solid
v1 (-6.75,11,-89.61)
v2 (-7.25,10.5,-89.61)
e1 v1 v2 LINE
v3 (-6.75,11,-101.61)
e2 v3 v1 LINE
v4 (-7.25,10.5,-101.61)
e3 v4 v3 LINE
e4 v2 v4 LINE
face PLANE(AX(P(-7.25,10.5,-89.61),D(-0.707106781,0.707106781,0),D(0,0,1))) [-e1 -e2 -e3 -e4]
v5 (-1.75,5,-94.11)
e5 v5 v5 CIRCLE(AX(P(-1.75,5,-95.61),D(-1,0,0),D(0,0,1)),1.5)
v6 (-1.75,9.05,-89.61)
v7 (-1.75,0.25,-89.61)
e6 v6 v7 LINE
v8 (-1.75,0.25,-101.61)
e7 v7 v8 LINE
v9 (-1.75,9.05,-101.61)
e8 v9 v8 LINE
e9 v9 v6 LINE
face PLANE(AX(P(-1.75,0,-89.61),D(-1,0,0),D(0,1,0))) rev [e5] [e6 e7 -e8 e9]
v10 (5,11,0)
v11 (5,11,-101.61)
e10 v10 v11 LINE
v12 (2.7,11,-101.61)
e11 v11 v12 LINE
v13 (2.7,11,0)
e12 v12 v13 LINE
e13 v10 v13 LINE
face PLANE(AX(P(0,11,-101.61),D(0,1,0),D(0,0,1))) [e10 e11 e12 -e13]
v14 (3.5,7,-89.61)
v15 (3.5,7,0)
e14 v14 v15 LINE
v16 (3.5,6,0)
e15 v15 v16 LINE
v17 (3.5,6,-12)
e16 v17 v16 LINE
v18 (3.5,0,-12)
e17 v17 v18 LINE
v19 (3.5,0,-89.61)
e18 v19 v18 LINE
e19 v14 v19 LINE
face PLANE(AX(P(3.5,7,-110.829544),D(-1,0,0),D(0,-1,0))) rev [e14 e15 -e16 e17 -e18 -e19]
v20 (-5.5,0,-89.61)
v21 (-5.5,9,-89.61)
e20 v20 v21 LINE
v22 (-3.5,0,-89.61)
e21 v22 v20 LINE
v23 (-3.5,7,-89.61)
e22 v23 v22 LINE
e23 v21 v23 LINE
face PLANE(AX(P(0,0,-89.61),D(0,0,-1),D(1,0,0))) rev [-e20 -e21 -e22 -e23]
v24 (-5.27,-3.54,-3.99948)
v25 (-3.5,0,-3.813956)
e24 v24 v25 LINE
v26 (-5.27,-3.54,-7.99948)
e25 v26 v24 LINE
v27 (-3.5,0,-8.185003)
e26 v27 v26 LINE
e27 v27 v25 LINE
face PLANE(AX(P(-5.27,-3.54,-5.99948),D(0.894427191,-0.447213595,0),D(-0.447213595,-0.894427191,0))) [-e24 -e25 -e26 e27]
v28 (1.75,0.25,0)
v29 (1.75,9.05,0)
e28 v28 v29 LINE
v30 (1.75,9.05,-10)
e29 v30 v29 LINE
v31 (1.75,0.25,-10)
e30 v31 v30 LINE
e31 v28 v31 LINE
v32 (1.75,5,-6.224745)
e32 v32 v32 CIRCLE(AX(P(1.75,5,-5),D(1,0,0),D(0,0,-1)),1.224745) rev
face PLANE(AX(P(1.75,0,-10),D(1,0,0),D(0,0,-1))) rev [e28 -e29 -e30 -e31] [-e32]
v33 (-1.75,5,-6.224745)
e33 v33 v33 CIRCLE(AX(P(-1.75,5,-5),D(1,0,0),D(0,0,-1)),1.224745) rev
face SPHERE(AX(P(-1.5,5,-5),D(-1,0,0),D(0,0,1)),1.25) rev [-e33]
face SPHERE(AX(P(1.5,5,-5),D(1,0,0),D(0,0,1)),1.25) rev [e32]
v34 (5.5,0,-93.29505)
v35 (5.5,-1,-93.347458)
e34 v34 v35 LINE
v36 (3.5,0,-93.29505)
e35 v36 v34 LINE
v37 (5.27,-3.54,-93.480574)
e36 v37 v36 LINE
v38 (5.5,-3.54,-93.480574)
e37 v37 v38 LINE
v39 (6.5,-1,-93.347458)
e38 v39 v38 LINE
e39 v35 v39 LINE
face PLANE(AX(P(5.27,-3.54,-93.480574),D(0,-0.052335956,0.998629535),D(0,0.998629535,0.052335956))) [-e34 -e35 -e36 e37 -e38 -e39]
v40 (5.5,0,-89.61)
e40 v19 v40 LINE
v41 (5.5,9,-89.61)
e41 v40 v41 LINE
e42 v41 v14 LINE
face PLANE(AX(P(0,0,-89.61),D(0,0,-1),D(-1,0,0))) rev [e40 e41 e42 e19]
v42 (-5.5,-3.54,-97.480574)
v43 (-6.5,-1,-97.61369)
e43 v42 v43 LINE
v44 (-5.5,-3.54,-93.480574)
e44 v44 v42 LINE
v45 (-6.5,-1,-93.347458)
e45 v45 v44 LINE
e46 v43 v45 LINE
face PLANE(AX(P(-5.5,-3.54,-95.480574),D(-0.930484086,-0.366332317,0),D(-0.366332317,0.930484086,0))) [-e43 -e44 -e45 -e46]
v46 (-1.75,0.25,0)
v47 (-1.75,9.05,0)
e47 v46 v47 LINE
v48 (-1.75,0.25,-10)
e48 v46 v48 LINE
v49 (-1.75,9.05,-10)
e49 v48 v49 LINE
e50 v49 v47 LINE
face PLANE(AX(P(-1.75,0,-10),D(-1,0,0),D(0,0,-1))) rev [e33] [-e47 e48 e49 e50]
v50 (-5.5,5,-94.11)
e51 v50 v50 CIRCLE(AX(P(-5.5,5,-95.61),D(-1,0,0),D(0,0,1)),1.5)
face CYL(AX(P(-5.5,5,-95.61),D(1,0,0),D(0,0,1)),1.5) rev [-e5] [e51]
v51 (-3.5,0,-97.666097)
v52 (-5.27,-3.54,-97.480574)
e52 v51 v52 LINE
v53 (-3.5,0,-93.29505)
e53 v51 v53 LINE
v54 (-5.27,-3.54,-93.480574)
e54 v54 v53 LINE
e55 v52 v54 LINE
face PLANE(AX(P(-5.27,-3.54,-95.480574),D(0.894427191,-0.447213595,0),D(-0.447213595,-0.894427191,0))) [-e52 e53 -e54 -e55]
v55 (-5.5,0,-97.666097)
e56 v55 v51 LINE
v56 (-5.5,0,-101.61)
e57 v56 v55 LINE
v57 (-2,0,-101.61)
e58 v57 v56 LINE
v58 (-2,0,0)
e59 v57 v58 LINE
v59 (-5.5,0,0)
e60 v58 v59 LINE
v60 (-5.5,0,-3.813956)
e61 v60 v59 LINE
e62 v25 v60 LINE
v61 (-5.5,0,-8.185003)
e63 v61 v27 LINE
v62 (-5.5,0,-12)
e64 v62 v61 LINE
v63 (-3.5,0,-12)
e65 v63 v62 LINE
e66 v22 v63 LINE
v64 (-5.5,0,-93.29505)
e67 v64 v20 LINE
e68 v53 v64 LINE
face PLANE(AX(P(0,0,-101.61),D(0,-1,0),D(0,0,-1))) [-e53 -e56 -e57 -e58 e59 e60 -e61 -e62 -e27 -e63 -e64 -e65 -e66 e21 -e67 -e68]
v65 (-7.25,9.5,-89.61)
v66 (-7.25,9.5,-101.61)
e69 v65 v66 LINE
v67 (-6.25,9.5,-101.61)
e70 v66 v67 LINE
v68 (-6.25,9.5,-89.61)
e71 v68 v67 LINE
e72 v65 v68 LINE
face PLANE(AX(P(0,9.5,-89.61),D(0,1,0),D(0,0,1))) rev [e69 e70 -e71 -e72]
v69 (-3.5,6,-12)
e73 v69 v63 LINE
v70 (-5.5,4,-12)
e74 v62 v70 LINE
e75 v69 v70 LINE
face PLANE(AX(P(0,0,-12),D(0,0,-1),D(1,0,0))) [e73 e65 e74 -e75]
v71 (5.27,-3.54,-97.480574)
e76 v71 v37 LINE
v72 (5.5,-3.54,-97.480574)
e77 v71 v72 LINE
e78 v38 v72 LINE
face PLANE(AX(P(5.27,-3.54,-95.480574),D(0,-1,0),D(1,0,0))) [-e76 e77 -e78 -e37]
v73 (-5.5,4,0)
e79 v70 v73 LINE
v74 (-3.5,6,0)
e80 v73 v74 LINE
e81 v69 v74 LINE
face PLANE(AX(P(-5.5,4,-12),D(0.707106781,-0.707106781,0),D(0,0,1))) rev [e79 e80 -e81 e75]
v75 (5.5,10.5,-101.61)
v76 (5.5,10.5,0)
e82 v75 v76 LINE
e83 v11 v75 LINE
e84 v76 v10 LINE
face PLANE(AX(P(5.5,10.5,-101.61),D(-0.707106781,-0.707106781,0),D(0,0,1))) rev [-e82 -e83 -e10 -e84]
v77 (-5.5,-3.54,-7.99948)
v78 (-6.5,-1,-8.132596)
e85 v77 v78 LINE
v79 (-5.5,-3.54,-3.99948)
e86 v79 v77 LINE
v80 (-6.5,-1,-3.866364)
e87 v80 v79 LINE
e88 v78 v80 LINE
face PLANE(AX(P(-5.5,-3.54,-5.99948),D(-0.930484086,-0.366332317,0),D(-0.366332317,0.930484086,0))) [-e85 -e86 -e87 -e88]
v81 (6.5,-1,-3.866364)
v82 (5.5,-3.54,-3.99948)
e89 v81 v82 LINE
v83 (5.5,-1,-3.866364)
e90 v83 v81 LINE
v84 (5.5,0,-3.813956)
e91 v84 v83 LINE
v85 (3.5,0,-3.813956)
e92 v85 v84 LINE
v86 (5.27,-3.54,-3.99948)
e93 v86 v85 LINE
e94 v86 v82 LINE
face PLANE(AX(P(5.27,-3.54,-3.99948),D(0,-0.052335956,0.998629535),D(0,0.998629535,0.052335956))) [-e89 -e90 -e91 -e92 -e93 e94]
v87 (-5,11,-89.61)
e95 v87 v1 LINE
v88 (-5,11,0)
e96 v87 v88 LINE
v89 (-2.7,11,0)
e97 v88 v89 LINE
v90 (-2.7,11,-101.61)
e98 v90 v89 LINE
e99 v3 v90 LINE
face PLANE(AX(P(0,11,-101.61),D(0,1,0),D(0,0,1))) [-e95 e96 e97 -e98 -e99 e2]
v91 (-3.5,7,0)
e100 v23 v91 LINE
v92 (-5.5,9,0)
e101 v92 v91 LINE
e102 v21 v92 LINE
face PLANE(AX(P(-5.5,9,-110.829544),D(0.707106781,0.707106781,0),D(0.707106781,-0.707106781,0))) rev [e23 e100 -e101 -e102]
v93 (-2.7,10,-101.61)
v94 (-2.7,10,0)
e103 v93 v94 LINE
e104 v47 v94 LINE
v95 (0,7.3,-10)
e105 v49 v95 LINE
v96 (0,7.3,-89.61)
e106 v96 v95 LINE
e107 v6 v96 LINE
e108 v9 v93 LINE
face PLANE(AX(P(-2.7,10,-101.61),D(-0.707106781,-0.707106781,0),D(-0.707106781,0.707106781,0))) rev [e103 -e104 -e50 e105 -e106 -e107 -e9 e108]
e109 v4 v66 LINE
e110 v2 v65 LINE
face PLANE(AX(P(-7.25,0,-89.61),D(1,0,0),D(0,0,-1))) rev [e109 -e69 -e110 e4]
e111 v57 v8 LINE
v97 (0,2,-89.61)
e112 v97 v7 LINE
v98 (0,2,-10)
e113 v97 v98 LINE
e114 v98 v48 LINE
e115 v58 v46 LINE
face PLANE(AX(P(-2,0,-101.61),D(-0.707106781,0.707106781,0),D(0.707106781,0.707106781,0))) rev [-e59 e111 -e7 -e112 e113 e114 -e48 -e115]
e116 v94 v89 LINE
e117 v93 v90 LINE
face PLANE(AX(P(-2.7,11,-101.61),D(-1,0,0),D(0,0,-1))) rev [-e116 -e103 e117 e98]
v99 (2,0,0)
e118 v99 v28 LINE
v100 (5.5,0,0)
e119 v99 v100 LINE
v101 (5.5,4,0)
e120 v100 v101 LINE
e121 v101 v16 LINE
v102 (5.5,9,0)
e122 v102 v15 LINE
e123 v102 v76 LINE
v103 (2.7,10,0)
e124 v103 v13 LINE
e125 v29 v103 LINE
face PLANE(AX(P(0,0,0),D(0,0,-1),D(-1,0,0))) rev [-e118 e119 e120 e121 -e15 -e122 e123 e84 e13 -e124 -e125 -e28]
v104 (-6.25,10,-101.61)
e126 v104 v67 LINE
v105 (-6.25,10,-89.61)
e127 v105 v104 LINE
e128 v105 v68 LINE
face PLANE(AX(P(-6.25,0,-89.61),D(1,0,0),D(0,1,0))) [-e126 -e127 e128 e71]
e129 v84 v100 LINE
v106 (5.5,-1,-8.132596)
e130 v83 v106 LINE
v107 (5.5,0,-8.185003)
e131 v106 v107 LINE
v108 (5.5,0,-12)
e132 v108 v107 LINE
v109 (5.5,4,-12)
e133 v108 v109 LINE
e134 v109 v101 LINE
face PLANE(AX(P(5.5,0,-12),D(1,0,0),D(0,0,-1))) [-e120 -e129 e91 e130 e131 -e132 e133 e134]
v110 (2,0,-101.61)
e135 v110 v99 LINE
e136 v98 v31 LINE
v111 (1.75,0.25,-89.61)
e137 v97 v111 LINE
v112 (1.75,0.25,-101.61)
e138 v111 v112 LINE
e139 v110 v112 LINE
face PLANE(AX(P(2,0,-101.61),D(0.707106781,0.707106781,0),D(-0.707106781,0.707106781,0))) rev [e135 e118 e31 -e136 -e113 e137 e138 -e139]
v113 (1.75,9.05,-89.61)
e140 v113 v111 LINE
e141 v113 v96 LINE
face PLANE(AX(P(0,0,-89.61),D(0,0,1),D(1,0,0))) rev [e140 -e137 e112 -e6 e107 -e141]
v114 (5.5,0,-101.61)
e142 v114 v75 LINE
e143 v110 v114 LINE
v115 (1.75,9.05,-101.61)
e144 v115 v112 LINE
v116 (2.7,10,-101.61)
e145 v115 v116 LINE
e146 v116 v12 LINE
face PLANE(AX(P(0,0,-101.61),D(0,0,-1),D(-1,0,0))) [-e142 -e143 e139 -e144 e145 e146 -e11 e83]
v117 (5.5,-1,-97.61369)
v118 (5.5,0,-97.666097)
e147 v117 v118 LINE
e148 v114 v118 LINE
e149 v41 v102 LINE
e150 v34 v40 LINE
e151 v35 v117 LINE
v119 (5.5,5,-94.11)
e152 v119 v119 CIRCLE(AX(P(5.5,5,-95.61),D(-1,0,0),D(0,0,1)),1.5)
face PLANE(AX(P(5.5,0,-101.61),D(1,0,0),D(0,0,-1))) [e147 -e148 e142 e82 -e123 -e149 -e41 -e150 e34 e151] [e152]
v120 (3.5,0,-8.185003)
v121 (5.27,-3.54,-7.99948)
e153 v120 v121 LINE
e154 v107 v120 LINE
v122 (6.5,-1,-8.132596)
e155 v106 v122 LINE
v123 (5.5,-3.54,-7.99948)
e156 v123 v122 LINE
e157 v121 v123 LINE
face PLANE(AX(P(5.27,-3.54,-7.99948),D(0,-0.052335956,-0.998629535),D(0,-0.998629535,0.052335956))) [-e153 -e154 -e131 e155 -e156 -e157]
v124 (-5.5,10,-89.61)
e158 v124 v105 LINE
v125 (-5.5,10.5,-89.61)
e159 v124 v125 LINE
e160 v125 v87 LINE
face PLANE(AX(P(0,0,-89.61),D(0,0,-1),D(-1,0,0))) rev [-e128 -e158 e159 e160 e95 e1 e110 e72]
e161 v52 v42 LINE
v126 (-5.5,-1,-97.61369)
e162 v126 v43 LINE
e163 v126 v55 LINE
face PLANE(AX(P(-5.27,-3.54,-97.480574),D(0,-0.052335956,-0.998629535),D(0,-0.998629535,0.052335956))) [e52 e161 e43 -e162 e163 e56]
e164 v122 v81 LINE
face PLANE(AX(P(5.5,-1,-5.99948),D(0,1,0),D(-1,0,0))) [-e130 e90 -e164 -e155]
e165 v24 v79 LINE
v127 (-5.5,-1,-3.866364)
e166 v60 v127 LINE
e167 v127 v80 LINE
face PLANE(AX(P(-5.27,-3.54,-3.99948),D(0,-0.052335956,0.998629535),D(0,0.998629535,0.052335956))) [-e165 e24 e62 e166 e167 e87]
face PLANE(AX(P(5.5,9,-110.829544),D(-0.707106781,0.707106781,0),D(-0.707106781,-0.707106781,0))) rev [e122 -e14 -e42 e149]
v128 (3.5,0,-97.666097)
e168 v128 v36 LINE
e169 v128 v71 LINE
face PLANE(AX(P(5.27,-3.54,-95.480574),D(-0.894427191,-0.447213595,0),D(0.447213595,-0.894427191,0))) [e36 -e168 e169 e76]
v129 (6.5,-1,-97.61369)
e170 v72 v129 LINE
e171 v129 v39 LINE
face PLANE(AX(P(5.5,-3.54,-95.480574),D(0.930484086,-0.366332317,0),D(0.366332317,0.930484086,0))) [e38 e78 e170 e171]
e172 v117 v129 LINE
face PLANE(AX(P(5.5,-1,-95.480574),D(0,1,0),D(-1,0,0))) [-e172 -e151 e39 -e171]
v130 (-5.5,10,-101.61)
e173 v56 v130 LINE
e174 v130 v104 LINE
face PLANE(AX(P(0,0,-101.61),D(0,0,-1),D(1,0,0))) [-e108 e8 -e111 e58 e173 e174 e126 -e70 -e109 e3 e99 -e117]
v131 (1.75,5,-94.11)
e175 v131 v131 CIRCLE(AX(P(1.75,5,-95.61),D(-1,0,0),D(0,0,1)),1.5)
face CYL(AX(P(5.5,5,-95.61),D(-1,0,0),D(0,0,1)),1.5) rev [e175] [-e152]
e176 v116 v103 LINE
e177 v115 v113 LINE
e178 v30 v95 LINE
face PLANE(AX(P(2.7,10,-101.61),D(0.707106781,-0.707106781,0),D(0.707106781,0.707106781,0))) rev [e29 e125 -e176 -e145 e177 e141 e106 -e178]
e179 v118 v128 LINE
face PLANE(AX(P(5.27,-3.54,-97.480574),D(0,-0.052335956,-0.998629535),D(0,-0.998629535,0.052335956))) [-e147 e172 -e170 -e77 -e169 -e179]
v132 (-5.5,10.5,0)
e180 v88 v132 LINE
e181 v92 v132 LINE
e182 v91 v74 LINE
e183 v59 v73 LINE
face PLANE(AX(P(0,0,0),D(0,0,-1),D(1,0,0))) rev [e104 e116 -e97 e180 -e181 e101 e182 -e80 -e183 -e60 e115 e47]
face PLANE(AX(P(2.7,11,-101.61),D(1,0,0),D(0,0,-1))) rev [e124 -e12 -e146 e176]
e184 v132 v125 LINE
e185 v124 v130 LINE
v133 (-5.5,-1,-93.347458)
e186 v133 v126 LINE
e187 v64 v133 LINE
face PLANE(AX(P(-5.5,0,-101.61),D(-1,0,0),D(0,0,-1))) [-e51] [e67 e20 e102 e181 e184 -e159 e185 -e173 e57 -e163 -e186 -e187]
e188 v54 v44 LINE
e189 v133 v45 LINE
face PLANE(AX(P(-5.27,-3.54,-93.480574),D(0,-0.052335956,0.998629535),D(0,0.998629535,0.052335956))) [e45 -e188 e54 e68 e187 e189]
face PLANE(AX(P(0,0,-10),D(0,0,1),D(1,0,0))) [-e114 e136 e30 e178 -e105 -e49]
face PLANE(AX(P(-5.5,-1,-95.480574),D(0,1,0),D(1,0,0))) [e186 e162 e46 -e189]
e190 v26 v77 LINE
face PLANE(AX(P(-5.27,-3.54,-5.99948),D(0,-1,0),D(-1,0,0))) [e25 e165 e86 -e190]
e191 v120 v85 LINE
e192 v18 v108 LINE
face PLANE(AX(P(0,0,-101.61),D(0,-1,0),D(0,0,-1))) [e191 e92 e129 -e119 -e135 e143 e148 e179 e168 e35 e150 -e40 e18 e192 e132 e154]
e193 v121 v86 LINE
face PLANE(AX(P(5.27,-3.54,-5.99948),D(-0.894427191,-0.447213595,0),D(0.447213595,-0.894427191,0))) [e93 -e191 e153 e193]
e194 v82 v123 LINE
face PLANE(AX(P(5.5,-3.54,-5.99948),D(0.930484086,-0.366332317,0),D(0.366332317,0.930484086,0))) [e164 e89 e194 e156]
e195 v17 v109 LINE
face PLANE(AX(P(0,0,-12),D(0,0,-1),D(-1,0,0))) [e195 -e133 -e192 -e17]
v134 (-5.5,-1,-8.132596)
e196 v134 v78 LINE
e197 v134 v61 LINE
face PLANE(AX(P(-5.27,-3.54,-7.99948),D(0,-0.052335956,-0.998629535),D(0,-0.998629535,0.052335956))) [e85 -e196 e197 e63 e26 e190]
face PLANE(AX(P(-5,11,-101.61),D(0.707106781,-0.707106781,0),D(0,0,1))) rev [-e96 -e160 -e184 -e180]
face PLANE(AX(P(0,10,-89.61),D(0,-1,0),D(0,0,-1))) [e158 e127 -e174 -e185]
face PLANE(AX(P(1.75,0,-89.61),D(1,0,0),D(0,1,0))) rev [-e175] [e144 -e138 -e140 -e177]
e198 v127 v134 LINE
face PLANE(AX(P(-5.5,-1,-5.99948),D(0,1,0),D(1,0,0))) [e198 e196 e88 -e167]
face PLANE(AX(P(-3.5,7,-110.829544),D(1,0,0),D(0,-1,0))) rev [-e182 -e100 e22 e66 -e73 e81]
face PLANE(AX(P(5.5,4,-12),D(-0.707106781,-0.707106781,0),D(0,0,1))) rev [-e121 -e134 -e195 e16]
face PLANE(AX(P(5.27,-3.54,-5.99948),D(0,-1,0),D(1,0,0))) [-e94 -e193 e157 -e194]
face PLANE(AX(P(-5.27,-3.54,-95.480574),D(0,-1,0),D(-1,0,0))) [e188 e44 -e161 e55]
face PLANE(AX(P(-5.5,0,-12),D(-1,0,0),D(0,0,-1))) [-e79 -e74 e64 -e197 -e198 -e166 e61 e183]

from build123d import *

# Parameters (mm, degrees)
SKETCH1_W                        = 5.5
SKETCH1_H                        = 11
MAIN_BASE_DEPTH                  = 101.61
SIDE_CUT_OUT_DEPTH               = 89.61
TOP_RUBBER_BAND_CUT_OUT_DEPTH    = 103.351561297
BOTTOM_RUBBER_BAND_CUT_OUT_DEPTH = 103.351561297
SKETCH6_W                        = 1.75
SKETCH6_H                        = 11
MOTOR_PULLEY_CUT_OUT_DEPTH       = 12
SKETCH7_W                        = 1.75
SKETCH7_H                        = 11
PULLEY_CUT_OUT_DEPTH             = 10
SKETCH11_R                       = 1.5
MOTOR_SHAFT_CUT_OUT_DEPTH        = 103.272452792
SNAP_START                       = 5.27
SNAP_HOOK_DRIVEN_SIDE_DEPTH      = 0.23
SNAP_START_2                     = -97.613689555
SNAP_HOOK_DRIVEN_SIDE_2_DEPTH    = 4.266231519
SNAP_START_3                     = -97.666097334
SNAP_HOOK_DRIVEN_SIDE_3_DEPTH    = 4.371047077
SNAP_START_4                     = 3
SNAP_HOOK_DRIVEN_SIDE_4_DEPTH    = 4
SKETCH16_W                       = 2
SKETCH16_H                       = 6
SNAP_HOOK_BASE_DEPTH             = 12
SNAP_HOOK_BASE_CHAMFER_SIZE      = 2
SNAP_HOOK_GUIDE_SIDE_DEPTH       = 0.23
SNAP_START_5                     = -8.132595504
SNAP_HOOK_GUIDE_SIDE_2_DEPTH     = 4.266231519
SNAP_START_6                     = -8.185003283
SNAP_HOOK_GUIDE_SIDE_3_DEPTH     = 4.371047078
SNAP_HOOK_GUIDE_SIDE_4_DEPTH     = 4
SKETCH13_W                       = 1
SKETCH13_H                       = 0.5
BOSS_EXTRUDE3_DEPTH              = 12
RAIL_CHAMFER_SIZE                = 0.5


with BuildPart() as part:
    # Sketch1 → main_base (new body)
    with BuildSketch(Plane.XY):
        with Locations((2.75, 5.5)):
            Rectangle(SKETCH1_W, SKETCH1_H)
    extrude(amount=-MAIN_BASE_DEPTH)

    # Sketch3 → side_cut_out (cut)
    with BuildSketch(Plane.XY):
        Polygon((5.5, 9), (3.5, 7), (3.5, 0), (5.5, 0), align=None)
    extrude(amount=-SIDE_CUT_OUT_DEPTH, mode=Mode.SUBTRACT)

    # Sketch4 → top_rubber_band_cut_out (cut, through all)
    with BuildSketch(Plane.XY):
        Polygon((0, 7.3), (0, 11), (2.7, 11), (2.7, 10), align=None)
    extrude(amount=-TOP_RUBBER_BAND_CUT_OUT_DEPTH, mode=Mode.SUBTRACT)

    # Sketch5 → bottom_rubber_band_cut_out (cut, through all)
    with BuildSketch(Plane.XY):
        Polygon((2, 0), (0, 2), (0, 0), align=None)
    extrude(amount=-BOTTOM_RUBBER_BAND_CUT_OUT_DEPTH, mode=Mode.SUBTRACT)

    # Sketch6 → motor_pulley_cut_out (cut)
    with BuildSketch(Plane(origin=(0, 0, -101.61), x_dir=(-1, 0, 0), z_dir=(0, 0, -1))):
        with Locations((-0.875, 5.5)):
            Rectangle(SKETCH6_W, SKETCH6_H)
    extrude(amount=-MOTOR_PULLEY_CUT_OUT_DEPTH, mode=Mode.SUBTRACT)

    # Sketch7 → pulley_cut_out (cut)
    with BuildSketch(Plane.XY):
        with Locations((0.875, 5.5)):
            Rectangle(SKETCH7_W, SKETCH7_H)
    extrude(amount=-PULLEY_CUT_OUT_DEPTH, mode=Mode.SUBTRACT)

    # Sketch10 → half_circle_cut_out (revolve, cut)
    with BuildSketch(Plane(origin=(0, 5, 0), x_dir=(1, 0, 0), z_dir=(0, 1, 0))):
        with BuildLine():
            Line((1.5, 5), (1.5, 3.75))
            ThreePointArc((1.5, 3.75), (2.383883476, 4.116116524), (2.75, 5))
            Line((2.75, 5), (1.5, 5))
        make_face()
    revolve(axis=Axis((2.75, 5, -5), (-1, 0, 0)), mode=Mode.SUBTRACT)

    # Sketch11 → motor_shaft_cut_out (cut, through all)
    with BuildSketch(Plane.ZY.offset(-1.75)):
        with Locations((-95.61, 5)):
            Circle(SKETCH11_R)
    extrude(amount=-MOTOR_SHAFT_CUT_OUT_DEPTH, mode=Mode.SUBTRACT)



with BuildPart() as body_2:
    # Snap Hook Driven Side: read off the stored shape, not the designer's step
    # Snap Hook Driven Side outline → Snap Hook Driven Side (new body)
    with BuildSketch(Plane.YZ.offset(SNAP_START)):
        Polygon((-1, -97.613689555), (-1, -93.347458036), (-3.54, -93.480573796), (-3.54, -97.480573796), align=None)
    extrude(amount=SNAP_HOOK_DRIVEN_SIDE_DEPTH)


with BuildPart() as part_1:
    add(part.part)

    add(body_2.part)  # Snap Hook Driven Side 2 merges body 2
    # Snap Hook Driven Side 2 outline → Snap Hook Driven Side 2 (add)
    with BuildSketch(Plane.XY.offset(SNAP_START_2)):
        Polygon((5.5, 0), (3.5, 0), (5.27, -3.54), (5.27, -1), (5.5, -1), align=None)
        Polygon((6.5, -1), (5.5, -1), (5.5, -3.54), align=None)
    extrude(amount=SNAP_HOOK_DRIVEN_SIDE_2_DEPTH)

    # Snap Hook Driven Side 3 outline → Snap Hook Driven Side 3 (add)
    with BuildSketch(Plane.XY.offset(SNAP_START_3)):
        Polygon((5.5, 0), (3.5, 0), (5.27, -3.54), (5.27, -1), (5.5, -1), align=None)
    extrude(amount=SNAP_HOOK_DRIVEN_SIDE_3_DEPTH)

    # Snap Hook Driven Side 4 outline → Snap Hook Driven Side 4 (cut)
    with BuildSketch(Plane.YZ.offset(SNAP_START_4)):
        Polygon((0, -93.295050257), (-5, -93.295050257), (-5, -93.557089154), (-3.54, -93.480573796), align=None)
        Polygon((-3.54, -97.480573796), (-5, -97.404058439), (-5, -97.666097334), (0, -97.666097334), align=None)
    extrude(amount=SNAP_HOOK_DRIVEN_SIDE_4_DEPTH, mode=Mode.SUBTRACT)

    # Sketch16 → Snap Hook Base (add)
    with BuildSketch(Plane.XY):
        with Locations((4.5, 3)):
            Rectangle(SKETCH16_W, SKETCH16_H)
    extrude(amount=-SNAP_HOOK_BASE_DEPTH)

    # Snap Hook Base Chamfer
    snap_hook_base_chamfer_edges = [part_1.edges().sort_by_distance(p)[0] for p in [
        (5.5, 6, -6),
    ]]
    chamfer(snap_hook_base_chamfer_edges, length=SNAP_HOOK_BASE_CHAMFER_SIZE - 0.0001)  # a hair under: the kernel refuses the full size



with BuildPart() as body_2_2:
    # Snap Hook Guide Side: read off the stored shape, not the designer's step
    # Snap Hook Guide Side outline → Snap Hook Guide Side (new body)
    with BuildSketch(Plane.YZ.offset(SNAP_START)):
        Polygon((-1, -3.866363984), (-3.54, -3.999479744), (-3.54, -7.999479744), (-1, -8.132595504), align=None)
    extrude(amount=SNAP_HOOK_GUIDE_SIDE_DEPTH)


with BuildPart() as part_2:
    add(part_1.part)

    add(body_2_2.part)  # Snap Hook Guide Side 2 merges body 2 2
    # Snap Hook Guide Side 2 outline → Snap Hook Guide Side 2 (add)
    with BuildSketch(Plane.XY.offset(SNAP_START_5)):
        Polygon((5.27, -1), (5.5, -1), (5.5, 0), (3.5, 0), (5.27, -3.54), align=None)
        Polygon((6.5, -1), (5.5, -1), (5.5, -3.54), align=None)
    extrude(amount=SNAP_HOOK_GUIDE_SIDE_2_DEPTH)

    # Snap Hook Guide Side 3 outline → Snap Hook Guide Side 3 (add)
    with BuildSketch(Plane.XY.offset(SNAP_START_6)):
        Polygon((5.27, -1), (5.5, -1), (5.5, 0), (3.5, 0), (5.27, -3.54), align=None)
    extrude(amount=SNAP_HOOK_GUIDE_SIDE_3_DEPTH)

    # Snap Hook Guide Side 4 outline → Snap Hook Guide Side 4 (cut)
    with BuildSketch(Plane.YZ.offset(SNAP_START_4)):
        Polygon((0, -3.813956205), (-5, -3.813956205), (-5, -4.075995102), (-3.54, -3.999479744), align=None)
        Polygon((-3.54, -7.999479744), (-5, -7.922964386), (-5, -8.185003283), (0, -8.185003283), align=None)
    extrude(amount=SNAP_HOOK_GUIDE_SIDE_4_DEPTH, mode=Mode.SUBTRACT)

    # final_mirror: part across plane


with BuildPart() as part_3:
    add(part_2.part)
    add(part_2.part.mirror(Plane(origin=(0, 0, 0), x_dir=(0, 0, 1), z_dir=(1, 0, 0))))

    # Sketch13 → Boss-Extrude3 (add)
    with BuildSketch(Plane(origin=(0, 0, -101.61), x_dir=(-1, 0, 0), z_dir=(0, 0, -1))):
        Polygon((7.25, 11), (5.5, 11), (5.5, 10), (6.25, 10), (7.25, 10), align=None)
        with Locations((6.75, 9.75)):
            Rectangle(SKETCH13_W, SKETCH13_H)
    extrude(amount=-BOSS_EXTRUDE3_DEPTH)

    # rail_chamfer
    rail_chamfer_edges = [part_3.edges().sort_by_distance(p)[0] for p in [
        (-5.5, 11, -44.805),
        (-7.25, 11, -95.61),
        (5.5, 11, -50.805),
    ]]
    chamfer(rail_chamfer_edges, length=RAIL_CHAMFER_SIZE)


solid = part_3.part
